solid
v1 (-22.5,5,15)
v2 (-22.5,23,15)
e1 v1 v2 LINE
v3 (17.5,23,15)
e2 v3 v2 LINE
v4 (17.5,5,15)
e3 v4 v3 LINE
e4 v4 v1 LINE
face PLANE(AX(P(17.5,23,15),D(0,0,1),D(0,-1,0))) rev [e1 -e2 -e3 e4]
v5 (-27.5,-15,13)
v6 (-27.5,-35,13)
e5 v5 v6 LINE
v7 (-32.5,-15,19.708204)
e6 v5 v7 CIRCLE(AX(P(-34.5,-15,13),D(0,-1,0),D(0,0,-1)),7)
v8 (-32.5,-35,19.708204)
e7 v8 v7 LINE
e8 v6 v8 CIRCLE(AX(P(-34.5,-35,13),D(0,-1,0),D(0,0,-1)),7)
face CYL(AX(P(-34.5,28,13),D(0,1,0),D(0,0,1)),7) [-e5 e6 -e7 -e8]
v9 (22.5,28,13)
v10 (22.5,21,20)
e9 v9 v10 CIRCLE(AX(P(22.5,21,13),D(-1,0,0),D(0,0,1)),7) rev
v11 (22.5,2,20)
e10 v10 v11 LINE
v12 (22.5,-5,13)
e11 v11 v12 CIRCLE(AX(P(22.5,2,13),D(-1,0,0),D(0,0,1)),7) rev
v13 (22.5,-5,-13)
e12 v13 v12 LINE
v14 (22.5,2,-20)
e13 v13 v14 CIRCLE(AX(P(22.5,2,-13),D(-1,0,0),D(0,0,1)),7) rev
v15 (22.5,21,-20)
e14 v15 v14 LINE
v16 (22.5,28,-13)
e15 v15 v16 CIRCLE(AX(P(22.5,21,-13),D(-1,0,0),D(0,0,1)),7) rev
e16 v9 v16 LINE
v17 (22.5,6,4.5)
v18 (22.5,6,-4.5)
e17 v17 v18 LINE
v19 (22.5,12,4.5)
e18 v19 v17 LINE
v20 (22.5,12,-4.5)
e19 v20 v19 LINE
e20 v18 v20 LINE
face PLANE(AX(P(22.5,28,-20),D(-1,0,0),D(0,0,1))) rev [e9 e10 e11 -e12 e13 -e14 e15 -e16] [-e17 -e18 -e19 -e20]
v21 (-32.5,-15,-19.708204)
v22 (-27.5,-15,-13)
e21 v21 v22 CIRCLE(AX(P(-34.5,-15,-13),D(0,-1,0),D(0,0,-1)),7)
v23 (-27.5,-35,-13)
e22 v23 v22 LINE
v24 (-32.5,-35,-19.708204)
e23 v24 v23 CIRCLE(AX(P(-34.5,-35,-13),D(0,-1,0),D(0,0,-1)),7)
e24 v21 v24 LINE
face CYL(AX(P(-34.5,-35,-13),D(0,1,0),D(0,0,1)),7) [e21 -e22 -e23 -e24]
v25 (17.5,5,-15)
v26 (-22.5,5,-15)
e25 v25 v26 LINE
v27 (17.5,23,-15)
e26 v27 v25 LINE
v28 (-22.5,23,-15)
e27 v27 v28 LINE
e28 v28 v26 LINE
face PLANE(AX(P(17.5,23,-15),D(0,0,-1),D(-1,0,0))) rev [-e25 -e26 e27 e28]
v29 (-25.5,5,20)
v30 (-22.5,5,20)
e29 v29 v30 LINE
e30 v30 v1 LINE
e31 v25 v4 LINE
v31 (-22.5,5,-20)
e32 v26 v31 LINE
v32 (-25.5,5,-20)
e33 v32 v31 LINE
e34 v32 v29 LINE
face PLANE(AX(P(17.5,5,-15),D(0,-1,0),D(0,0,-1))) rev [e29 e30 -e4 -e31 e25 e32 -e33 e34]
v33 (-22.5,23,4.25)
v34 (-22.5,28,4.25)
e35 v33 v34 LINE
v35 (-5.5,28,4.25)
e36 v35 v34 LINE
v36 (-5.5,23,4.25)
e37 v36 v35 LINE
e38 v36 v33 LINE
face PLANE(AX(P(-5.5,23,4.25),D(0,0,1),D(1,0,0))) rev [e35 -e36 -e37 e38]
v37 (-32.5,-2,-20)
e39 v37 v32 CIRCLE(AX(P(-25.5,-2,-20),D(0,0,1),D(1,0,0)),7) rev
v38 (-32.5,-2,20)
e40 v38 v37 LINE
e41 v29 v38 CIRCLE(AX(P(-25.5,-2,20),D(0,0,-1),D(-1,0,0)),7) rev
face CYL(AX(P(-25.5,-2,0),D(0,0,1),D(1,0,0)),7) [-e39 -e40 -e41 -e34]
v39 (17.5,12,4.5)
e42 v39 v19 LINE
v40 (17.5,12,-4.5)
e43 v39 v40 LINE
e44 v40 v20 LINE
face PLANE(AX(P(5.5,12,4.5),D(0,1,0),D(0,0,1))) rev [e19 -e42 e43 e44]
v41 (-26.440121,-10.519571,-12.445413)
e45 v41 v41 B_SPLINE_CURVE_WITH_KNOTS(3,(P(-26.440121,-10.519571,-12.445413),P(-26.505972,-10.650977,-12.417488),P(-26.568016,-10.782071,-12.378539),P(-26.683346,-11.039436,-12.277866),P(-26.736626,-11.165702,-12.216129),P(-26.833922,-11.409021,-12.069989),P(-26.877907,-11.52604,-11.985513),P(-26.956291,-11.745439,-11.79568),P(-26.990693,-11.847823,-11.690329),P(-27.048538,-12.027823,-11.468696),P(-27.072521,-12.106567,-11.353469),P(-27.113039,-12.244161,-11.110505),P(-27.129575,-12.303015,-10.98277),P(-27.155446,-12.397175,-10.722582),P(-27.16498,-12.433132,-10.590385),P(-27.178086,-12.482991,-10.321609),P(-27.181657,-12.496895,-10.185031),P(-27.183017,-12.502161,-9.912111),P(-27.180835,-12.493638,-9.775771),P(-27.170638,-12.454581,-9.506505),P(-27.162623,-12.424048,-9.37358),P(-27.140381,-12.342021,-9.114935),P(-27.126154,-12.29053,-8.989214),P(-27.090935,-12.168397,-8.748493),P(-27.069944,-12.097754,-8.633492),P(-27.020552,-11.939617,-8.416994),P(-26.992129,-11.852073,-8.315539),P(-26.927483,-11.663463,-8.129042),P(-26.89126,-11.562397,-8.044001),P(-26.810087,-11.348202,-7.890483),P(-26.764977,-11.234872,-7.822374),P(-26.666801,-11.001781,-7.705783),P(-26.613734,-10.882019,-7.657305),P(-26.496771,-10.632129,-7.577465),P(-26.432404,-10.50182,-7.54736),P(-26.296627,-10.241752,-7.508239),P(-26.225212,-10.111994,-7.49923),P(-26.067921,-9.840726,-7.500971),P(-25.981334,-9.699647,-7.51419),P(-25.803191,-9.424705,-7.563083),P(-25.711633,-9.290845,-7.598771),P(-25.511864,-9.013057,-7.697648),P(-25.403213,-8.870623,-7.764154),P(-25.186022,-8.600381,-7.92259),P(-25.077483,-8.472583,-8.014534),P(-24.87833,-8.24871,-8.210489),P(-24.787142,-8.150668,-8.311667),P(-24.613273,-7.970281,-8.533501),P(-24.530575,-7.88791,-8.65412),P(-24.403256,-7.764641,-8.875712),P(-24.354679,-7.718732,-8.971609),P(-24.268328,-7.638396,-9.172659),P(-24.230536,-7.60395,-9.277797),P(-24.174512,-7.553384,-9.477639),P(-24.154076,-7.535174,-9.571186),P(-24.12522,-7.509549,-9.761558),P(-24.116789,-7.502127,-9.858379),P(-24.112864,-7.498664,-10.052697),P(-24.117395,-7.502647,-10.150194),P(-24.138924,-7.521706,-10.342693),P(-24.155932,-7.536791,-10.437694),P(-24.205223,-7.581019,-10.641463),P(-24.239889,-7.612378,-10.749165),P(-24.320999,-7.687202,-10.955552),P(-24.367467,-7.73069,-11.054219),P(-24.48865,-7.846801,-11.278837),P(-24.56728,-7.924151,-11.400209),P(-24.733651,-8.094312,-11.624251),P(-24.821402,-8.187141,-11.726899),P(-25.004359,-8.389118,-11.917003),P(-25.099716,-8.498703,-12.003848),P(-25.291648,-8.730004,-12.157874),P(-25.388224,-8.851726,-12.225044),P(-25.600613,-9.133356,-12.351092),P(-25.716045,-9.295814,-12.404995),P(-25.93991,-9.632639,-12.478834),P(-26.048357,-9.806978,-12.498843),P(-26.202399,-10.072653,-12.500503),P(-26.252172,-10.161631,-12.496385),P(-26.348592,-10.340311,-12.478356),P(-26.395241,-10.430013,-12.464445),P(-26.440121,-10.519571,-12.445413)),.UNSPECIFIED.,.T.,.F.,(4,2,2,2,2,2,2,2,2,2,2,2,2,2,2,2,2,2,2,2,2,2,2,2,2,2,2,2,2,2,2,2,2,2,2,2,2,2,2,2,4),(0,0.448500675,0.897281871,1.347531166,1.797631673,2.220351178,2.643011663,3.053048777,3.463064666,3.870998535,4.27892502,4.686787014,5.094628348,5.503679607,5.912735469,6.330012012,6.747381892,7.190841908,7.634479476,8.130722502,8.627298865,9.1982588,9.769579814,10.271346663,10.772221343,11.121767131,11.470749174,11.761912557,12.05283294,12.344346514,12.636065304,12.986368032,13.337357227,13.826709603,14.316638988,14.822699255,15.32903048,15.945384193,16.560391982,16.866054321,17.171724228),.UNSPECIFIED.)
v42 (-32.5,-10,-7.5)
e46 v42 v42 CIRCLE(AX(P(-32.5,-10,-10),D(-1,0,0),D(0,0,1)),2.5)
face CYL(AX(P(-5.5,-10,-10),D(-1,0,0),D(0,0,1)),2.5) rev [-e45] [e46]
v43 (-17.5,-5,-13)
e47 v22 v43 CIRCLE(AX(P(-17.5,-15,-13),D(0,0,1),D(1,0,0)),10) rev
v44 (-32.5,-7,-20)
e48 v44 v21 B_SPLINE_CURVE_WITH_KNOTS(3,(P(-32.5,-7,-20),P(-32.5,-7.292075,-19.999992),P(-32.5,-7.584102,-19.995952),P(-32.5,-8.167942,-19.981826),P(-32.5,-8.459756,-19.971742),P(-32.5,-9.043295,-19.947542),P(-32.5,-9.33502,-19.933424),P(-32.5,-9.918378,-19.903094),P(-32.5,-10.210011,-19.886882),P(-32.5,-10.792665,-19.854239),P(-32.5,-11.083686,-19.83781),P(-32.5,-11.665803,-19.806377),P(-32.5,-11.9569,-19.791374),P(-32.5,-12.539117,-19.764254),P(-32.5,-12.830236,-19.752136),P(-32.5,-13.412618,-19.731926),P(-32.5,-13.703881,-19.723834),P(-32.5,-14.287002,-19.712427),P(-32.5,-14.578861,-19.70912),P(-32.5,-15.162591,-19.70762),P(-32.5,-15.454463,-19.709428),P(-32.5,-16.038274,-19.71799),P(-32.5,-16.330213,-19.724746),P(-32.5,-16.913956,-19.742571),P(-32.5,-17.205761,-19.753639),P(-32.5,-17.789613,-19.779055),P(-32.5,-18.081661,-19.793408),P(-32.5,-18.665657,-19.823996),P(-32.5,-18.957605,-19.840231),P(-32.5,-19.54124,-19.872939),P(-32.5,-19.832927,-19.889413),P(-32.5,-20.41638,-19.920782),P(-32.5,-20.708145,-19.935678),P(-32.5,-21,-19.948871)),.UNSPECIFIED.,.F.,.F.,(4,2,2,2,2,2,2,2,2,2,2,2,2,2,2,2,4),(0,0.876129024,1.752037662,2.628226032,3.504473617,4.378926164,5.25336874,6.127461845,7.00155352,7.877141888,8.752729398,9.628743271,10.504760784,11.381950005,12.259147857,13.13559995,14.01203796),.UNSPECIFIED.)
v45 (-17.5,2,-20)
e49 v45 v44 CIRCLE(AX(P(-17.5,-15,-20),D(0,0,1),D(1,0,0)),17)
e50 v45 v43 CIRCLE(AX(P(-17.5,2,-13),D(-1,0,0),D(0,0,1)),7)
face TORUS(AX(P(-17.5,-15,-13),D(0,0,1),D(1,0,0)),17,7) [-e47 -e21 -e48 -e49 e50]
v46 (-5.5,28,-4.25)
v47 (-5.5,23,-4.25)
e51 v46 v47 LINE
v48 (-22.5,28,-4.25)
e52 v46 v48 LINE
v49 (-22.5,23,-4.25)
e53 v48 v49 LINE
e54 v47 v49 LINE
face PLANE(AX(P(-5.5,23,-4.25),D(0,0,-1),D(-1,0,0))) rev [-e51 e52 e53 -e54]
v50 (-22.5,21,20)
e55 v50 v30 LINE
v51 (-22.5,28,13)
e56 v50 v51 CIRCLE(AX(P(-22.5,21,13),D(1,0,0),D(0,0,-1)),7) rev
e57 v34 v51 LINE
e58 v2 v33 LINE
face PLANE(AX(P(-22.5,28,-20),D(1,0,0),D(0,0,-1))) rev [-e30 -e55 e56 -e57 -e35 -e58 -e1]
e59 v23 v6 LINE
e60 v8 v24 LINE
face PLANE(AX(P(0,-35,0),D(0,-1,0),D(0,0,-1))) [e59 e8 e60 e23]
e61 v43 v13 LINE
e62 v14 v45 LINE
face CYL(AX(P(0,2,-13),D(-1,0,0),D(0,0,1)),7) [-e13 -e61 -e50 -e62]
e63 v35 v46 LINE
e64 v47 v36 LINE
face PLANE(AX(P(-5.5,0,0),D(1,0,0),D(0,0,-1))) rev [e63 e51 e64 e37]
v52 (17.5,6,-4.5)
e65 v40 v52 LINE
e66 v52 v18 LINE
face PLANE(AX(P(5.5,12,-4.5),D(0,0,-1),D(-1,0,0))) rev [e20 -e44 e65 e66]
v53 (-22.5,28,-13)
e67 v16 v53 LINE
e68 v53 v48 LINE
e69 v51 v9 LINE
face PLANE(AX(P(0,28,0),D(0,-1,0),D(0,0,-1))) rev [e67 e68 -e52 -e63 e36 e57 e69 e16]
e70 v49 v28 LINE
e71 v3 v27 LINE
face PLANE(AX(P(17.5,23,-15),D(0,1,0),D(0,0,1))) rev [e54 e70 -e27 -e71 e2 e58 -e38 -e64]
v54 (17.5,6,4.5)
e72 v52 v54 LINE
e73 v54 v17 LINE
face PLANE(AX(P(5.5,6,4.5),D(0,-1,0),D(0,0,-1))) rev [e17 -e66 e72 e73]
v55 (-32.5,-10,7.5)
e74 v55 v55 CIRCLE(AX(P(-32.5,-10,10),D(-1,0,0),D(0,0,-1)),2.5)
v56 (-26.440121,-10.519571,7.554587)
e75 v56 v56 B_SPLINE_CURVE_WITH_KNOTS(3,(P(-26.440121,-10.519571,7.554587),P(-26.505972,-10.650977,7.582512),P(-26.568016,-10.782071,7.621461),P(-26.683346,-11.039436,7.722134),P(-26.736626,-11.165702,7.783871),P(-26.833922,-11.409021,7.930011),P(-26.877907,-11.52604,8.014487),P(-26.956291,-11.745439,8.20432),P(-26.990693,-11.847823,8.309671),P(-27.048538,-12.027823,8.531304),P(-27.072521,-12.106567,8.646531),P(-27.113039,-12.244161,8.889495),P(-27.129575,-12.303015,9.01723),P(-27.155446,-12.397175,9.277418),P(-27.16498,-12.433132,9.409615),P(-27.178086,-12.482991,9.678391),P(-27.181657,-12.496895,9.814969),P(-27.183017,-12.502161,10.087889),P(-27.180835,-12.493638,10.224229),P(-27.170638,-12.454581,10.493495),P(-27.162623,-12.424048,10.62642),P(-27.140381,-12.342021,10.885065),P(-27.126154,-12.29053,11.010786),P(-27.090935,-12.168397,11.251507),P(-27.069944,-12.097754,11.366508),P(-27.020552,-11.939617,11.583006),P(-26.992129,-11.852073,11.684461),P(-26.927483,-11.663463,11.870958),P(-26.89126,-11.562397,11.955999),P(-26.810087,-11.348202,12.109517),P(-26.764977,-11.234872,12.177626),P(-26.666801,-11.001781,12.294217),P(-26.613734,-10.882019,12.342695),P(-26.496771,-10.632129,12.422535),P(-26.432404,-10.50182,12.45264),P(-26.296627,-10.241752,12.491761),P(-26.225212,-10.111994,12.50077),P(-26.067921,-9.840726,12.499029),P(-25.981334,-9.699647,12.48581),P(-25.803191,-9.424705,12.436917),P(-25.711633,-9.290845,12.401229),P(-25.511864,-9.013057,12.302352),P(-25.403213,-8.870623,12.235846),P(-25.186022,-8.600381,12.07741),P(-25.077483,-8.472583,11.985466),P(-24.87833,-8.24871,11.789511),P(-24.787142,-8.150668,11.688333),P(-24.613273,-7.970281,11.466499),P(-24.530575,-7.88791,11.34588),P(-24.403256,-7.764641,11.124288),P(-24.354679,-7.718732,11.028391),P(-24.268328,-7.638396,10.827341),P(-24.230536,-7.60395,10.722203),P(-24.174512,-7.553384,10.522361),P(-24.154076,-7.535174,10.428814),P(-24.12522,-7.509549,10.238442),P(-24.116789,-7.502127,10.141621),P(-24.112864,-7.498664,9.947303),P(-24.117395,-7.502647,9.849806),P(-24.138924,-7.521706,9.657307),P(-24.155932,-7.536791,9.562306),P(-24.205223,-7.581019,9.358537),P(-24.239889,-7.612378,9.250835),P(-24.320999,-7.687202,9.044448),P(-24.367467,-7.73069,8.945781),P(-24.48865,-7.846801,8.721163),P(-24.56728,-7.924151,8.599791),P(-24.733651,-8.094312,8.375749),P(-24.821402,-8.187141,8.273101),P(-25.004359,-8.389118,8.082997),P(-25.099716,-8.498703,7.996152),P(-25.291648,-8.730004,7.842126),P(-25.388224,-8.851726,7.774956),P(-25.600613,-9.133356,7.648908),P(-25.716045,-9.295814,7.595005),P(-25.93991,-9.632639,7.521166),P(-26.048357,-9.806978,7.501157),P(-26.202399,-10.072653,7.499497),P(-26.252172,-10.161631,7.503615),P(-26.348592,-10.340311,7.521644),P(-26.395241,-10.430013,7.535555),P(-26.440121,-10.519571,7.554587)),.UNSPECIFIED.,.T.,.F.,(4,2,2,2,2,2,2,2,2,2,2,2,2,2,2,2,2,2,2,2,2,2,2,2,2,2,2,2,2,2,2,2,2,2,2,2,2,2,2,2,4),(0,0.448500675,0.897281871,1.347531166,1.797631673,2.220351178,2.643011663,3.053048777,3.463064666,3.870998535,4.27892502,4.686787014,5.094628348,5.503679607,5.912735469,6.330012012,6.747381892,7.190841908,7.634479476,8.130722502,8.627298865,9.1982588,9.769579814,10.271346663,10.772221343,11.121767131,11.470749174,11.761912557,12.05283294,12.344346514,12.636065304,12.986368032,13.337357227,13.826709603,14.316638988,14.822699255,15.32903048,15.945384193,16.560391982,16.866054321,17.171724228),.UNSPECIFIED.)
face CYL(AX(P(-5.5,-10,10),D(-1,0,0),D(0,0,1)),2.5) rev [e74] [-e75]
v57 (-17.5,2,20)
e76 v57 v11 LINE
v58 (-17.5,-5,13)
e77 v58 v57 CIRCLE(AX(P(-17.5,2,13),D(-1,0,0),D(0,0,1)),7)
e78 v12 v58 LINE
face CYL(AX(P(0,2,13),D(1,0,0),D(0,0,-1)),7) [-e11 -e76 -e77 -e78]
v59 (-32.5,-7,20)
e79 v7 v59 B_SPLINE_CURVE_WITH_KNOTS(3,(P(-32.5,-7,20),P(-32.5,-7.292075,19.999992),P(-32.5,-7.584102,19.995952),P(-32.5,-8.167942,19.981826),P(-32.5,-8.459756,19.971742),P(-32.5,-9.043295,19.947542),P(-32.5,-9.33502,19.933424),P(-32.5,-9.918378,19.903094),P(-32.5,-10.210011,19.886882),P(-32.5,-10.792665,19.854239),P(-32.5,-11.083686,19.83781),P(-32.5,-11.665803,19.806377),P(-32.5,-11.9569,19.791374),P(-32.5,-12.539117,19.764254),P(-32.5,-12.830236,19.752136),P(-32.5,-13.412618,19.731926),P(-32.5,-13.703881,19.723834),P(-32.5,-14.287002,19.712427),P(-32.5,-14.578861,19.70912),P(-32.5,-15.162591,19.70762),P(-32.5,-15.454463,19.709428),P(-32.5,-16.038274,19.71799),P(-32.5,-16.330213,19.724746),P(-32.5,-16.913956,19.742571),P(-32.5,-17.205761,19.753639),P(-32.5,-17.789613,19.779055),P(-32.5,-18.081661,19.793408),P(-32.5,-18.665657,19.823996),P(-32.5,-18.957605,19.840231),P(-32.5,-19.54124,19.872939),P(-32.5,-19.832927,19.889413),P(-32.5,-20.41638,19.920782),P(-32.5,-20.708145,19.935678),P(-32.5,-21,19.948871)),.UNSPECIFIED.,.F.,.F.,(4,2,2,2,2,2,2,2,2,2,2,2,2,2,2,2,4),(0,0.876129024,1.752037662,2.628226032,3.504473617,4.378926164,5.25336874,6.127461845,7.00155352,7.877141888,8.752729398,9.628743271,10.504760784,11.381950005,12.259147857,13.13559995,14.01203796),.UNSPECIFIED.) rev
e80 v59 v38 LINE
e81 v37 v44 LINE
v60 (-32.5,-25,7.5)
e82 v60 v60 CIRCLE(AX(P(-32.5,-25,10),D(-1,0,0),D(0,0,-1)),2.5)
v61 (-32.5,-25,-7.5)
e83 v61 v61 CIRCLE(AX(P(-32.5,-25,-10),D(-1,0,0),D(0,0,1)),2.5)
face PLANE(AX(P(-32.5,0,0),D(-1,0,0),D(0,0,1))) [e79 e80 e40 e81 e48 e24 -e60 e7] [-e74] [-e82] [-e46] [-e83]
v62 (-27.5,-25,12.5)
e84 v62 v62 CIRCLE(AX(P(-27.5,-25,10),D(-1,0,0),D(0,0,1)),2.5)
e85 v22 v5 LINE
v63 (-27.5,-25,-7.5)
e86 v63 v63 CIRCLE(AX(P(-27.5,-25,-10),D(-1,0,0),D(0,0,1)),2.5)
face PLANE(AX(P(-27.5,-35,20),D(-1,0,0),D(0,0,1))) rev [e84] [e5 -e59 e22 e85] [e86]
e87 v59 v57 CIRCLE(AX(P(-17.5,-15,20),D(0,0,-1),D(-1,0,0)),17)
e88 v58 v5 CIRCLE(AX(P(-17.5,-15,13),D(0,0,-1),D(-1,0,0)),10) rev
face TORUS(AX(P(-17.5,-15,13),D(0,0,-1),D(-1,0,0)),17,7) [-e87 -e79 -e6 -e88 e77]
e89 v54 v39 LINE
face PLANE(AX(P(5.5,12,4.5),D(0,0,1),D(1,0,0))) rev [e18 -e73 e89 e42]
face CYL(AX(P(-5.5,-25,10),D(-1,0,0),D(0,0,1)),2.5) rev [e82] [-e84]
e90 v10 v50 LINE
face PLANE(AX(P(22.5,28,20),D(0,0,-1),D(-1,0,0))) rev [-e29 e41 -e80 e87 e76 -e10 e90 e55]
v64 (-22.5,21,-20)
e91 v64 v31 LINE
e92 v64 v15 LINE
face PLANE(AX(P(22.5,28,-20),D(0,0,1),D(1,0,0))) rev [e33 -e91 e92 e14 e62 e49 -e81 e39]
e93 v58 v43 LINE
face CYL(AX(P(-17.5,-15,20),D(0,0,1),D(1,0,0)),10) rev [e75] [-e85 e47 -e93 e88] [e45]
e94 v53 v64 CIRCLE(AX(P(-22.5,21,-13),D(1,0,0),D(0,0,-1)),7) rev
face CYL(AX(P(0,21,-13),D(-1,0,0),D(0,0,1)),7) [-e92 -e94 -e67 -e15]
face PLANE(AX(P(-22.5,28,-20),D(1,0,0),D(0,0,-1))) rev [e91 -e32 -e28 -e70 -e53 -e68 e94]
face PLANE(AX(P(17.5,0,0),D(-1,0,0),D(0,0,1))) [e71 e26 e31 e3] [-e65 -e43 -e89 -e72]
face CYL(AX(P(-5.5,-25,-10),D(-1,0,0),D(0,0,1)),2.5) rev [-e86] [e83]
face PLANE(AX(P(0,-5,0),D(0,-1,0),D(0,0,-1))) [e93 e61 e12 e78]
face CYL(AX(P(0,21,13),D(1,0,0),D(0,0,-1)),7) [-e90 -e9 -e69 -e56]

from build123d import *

# Parameters (mm, degrees)
SKETCH1_W           = 45
SKETCH1_H           = 40
BOSS_EXTRUDE1_DEPTH = 28
SKETCH5_W           = 30
SKETCH5_H           = 18
CUT_EXTRUDE2_DEPTH  = 40
SKETCH6_W           = 8.5
SKETCH6_H           = 5
CUT_EXTRUDE3_DEPTH  = 17
SKETCH7_W           = 9
SKETCH7_H           = 6
CUT_EXTRUDE4_DEPTH  = 17
SKETCH8_W           = 45
SKETCH8_H           = 40
BOSS_EXTRUDE2_DEPTH = 5
SKETCH9_W           = 40
SKETCH9_H           = 10
BOSS_EXTRUDE3_DEPTH = 10
SKETCH10_W          = 5
SKETCH10_H          = 40
BOSS_EXTRUDE4_DEPTH = 30
SKETCH13_R          = 2.5
CUT_EXTRUDE5_DEPTH  = 27
FILLET1_R           = 10
FILLET3_R           = 7
FILLET4_R           = 7


with BuildPart() as part:
    # Sketch1 → Boss-Extrude1 (new body)
    with BuildSketch(Plane(origin=(0, 0, 0), x_dir=(1, 0, 0), z_dir=(0, 1, 0))):
        Rectangle(SKETCH1_W, SKETCH1_H)
    extrude(amount=BOSS_EXTRUDE1_DEPTH)

    # Sketch5 → Cut-Extrude2 (cut)
    with BuildSketch(Plane.ZY.offset(22.5)):
        with Locations((0, 14)):
            Rectangle(SKETCH5_W, SKETCH5_H)
    extrude(amount=-CUT_EXTRUDE2_DEPTH, mode=Mode.SUBTRACT)

    # Sketch6 → Cut-Extrude3 (cut)
    with BuildSketch(Plane.ZY.offset(22.5)):
        with Locations((0, 25.5)):
            Rectangle(SKETCH6_W, SKETCH6_H)
    extrude(amount=-CUT_EXTRUDE3_DEPTH, mode=Mode.SUBTRACT)

    # Sketch7 → Cut-Extrude4 (cut)
    with BuildSketch(Plane(origin=(22.5, 0, 0), x_dir=(0, 0, -1), z_dir=(1, 0, 0))):
        with Locations((0, 9)):
            Rectangle(SKETCH7_W, SKETCH7_H)
    extrude(amount=-CUT_EXTRUDE4_DEPTH, mode=Mode.SUBTRACT)

    # Sketch8 → Boss-Extrude2 (add)
    with BuildSketch(Plane.XZ):
        Rectangle(SKETCH8_W, SKETCH8_H)
    extrude(amount=BOSS_EXTRUDE2_DEPTH)

    # Sketch9 → Boss-Extrude3 (add)
    with BuildSketch(Plane.ZY.offset(22.5)):
        Rectangle(SKETCH9_W, SKETCH9_H)
    extrude(amount=BOSS_EXTRUDE3_DEPTH)

    # Sketch10 → Boss-Extrude4 (add)
    with BuildSketch(Plane.XZ.offset(5)):
        with Locations((-30, 0)):
            Rectangle(SKETCH10_W, SKETCH10_H)
    extrude(amount=BOSS_EXTRUDE4_DEPTH)

    # Sketch13 → Cut-Extrude5 (cut)
    with BuildSketch(Plane.ZY.offset(32.5)):
        with Locations((-10, -25)):
            Circle(SKETCH13_R)
        with Locations((-10, -10)):
            Circle(SKETCH13_R)
        with Locations((10, -10)):
            Circle(SKETCH13_R)
        with Locations((10, -25)):
            Circle(SKETCH13_R)
    extrude(amount=-CUT_EXTRUDE5_DEPTH, mode=Mode.SUBTRACT)

    # Fillet1
    # the kernel refuses this fillet: 10 mm, written as the material it adds along each edge
    with BuildSketch(Plane(origin=(-27.5, -5, 20), x_dir=(0, -1, 0), z_dir=(0, 0, -1))) as fillet1_piece_1_section:
        with BuildLine():
            CenterArc((FILLET1_R, -FILLET1_R), FILLET1_R, 90, 90)
            Line((0, -FILLET1_R), (0, 0))
            Line((0, 0), (FILLET1_R, 0))
        make_face()
    fillet1_piece_1 = extrude(amount=40, mode=Mode.PRIVATE)
    fillet1_piece_1 = fillet1_piece_1 - Plane(origin=(-25.136048253, -10, 10), x_dir=(0, 0, 1), z_dir=(-1, 0, 0)) * Cylinder(2.5, 121, mode=Mode.PRIVATE)
    fillet1_piece_1 = fillet1_piece_1 - Plane(origin=(-25.136048253, -10, -10), x_dir=(0, 0, 1), z_dir=(-1, 0, 0)) * Cylinder(2.5, 121, mode=Mode.PRIVATE)
    add(fillet1_piece_1)

    # Fillet3
    # the kernel refuses this fillet: 7 mm, written as the material it takes off along each edge
    with BuildSketch(Plane(origin=(-27.5, -15, -20), x_dir=(-1, 0, 0), z_dir=(0, -1, 0))) as fillet3_piece_1:
        with BuildLine():
            CenterArc((FILLET3_R, -FILLET3_R), FILLET3_R, 90, 90)
            Line((0, -FILLET3_R), (0, 0))
            Line((0, 0), (FILLET3_R, 0))
        make_face()
    extrude(amount=37.5, mode=Mode.SUBTRACT)
    with BuildSketch(Plane(origin=(-17.5, -15, -20), x_dir=(-1, 0, 0), z_dir=(0, -1, 0))) as fillet3_piece_2:
        with BuildLine():
            CenterArc((10 + FILLET3_R, -FILLET3_R), FILLET3_R, 90, 90)
            Line((10 + FILLET3_R, 0), (10, 0))
            Line((10, 0), (10, -FILLET3_R))
        make_face()
    revolve(axis=Axis((-17.5, -15, -20), (0, 0, -1)), revolution_arc=90, mode=Mode.SUBTRACT)
    with BuildSketch(Plane(origin=(-27.5, -15, 20), x_dir=(-1, 0, 0), z_dir=(0, -1, 0))) as fillet3_piece_3:
        with BuildLine():
            CenterArc((FILLET3_R, FILLET3_R), FILLET3_R, 180, 90)
            Line((0, FILLET3_R), (0, 0))
            Line((0, 0), (FILLET3_R, 0))
        make_face()
    extrude(amount=37.5, mode=Mode.SUBTRACT)
    with BuildSketch(Plane(origin=(-17.5, -15, 20), x_dir=(-1, 0, 0), z_dir=(0, -1, 0))) as fillet3_piece_4:
        with BuildLine():
            CenterArc((10 + FILLET3_R, FILLET3_R), FILLET3_R, 180, 90)
            Line((10 + FILLET3_R, 0), (10, 0))
            Line((10, 0), (10, FILLET3_R))
        make_face()
    revolve(axis=Axis((-17.5, -15, 20), (0, 0, -1)), revolution_arc=90, mode=Mode.SUBTRACT)
    with BuildSketch(Plane(origin=(40, -5, -20), x_dir=(0, 0, 1), z_dir=(-1, 0, 0))) as fillet3_piece_5:
        with BuildLine():
            CenterArc((FILLET3_R, FILLET3_R), FILLET3_R, 180, 90)
            Line((0, FILLET3_R), (0, 0))
            Line((0, 0), (FILLET3_R, 0))
        make_face()
    extrude(amount=57.5, mode=Mode.SUBTRACT)
    with BuildSketch(Plane(origin=(40, 28, -20), x_dir=(0, 0, 1), z_dir=(-1, 0, 0)), Plane(origin=(-40, 28, 20), x_dir=(0, 0, -1), z_dir=(1, 0, 0))) as fillet3_piece_6:
        with BuildLine():
            CenterArc((FILLET3_R, -FILLET3_R), FILLET3_R, 90, 90)
            Line((0, -FILLET3_R), (0, 0))
            Line((0, 0), (FILLET3_R, 0))
        make_face()
    extrude(amount=80, mode=Mode.SUBTRACT)
    with BuildSketch(Plane(origin=(40, -5, 20), x_dir=(0, 0, -1), z_dir=(-1, 0, 0))) as fillet3_piece_7:
        with BuildLine():
            CenterArc((FILLET3_R, -FILLET3_R), FILLET3_R, 90, 90)
            Line((0, -FILLET3_R), (0, 0))
            Line((0, 0), (FILLET3_R, 0))
        make_face()
    extrude(amount=57.5, mode=Mode.SUBTRACT)

    # Fillet4
    fillet4_edges = [part.edges().sort_by_distance(p)[0] for p in [
        (-32.5, 5, 0),
    ]]
    fillet(fillet4_edges, radius=FILLET4_R)


solid = part.part
